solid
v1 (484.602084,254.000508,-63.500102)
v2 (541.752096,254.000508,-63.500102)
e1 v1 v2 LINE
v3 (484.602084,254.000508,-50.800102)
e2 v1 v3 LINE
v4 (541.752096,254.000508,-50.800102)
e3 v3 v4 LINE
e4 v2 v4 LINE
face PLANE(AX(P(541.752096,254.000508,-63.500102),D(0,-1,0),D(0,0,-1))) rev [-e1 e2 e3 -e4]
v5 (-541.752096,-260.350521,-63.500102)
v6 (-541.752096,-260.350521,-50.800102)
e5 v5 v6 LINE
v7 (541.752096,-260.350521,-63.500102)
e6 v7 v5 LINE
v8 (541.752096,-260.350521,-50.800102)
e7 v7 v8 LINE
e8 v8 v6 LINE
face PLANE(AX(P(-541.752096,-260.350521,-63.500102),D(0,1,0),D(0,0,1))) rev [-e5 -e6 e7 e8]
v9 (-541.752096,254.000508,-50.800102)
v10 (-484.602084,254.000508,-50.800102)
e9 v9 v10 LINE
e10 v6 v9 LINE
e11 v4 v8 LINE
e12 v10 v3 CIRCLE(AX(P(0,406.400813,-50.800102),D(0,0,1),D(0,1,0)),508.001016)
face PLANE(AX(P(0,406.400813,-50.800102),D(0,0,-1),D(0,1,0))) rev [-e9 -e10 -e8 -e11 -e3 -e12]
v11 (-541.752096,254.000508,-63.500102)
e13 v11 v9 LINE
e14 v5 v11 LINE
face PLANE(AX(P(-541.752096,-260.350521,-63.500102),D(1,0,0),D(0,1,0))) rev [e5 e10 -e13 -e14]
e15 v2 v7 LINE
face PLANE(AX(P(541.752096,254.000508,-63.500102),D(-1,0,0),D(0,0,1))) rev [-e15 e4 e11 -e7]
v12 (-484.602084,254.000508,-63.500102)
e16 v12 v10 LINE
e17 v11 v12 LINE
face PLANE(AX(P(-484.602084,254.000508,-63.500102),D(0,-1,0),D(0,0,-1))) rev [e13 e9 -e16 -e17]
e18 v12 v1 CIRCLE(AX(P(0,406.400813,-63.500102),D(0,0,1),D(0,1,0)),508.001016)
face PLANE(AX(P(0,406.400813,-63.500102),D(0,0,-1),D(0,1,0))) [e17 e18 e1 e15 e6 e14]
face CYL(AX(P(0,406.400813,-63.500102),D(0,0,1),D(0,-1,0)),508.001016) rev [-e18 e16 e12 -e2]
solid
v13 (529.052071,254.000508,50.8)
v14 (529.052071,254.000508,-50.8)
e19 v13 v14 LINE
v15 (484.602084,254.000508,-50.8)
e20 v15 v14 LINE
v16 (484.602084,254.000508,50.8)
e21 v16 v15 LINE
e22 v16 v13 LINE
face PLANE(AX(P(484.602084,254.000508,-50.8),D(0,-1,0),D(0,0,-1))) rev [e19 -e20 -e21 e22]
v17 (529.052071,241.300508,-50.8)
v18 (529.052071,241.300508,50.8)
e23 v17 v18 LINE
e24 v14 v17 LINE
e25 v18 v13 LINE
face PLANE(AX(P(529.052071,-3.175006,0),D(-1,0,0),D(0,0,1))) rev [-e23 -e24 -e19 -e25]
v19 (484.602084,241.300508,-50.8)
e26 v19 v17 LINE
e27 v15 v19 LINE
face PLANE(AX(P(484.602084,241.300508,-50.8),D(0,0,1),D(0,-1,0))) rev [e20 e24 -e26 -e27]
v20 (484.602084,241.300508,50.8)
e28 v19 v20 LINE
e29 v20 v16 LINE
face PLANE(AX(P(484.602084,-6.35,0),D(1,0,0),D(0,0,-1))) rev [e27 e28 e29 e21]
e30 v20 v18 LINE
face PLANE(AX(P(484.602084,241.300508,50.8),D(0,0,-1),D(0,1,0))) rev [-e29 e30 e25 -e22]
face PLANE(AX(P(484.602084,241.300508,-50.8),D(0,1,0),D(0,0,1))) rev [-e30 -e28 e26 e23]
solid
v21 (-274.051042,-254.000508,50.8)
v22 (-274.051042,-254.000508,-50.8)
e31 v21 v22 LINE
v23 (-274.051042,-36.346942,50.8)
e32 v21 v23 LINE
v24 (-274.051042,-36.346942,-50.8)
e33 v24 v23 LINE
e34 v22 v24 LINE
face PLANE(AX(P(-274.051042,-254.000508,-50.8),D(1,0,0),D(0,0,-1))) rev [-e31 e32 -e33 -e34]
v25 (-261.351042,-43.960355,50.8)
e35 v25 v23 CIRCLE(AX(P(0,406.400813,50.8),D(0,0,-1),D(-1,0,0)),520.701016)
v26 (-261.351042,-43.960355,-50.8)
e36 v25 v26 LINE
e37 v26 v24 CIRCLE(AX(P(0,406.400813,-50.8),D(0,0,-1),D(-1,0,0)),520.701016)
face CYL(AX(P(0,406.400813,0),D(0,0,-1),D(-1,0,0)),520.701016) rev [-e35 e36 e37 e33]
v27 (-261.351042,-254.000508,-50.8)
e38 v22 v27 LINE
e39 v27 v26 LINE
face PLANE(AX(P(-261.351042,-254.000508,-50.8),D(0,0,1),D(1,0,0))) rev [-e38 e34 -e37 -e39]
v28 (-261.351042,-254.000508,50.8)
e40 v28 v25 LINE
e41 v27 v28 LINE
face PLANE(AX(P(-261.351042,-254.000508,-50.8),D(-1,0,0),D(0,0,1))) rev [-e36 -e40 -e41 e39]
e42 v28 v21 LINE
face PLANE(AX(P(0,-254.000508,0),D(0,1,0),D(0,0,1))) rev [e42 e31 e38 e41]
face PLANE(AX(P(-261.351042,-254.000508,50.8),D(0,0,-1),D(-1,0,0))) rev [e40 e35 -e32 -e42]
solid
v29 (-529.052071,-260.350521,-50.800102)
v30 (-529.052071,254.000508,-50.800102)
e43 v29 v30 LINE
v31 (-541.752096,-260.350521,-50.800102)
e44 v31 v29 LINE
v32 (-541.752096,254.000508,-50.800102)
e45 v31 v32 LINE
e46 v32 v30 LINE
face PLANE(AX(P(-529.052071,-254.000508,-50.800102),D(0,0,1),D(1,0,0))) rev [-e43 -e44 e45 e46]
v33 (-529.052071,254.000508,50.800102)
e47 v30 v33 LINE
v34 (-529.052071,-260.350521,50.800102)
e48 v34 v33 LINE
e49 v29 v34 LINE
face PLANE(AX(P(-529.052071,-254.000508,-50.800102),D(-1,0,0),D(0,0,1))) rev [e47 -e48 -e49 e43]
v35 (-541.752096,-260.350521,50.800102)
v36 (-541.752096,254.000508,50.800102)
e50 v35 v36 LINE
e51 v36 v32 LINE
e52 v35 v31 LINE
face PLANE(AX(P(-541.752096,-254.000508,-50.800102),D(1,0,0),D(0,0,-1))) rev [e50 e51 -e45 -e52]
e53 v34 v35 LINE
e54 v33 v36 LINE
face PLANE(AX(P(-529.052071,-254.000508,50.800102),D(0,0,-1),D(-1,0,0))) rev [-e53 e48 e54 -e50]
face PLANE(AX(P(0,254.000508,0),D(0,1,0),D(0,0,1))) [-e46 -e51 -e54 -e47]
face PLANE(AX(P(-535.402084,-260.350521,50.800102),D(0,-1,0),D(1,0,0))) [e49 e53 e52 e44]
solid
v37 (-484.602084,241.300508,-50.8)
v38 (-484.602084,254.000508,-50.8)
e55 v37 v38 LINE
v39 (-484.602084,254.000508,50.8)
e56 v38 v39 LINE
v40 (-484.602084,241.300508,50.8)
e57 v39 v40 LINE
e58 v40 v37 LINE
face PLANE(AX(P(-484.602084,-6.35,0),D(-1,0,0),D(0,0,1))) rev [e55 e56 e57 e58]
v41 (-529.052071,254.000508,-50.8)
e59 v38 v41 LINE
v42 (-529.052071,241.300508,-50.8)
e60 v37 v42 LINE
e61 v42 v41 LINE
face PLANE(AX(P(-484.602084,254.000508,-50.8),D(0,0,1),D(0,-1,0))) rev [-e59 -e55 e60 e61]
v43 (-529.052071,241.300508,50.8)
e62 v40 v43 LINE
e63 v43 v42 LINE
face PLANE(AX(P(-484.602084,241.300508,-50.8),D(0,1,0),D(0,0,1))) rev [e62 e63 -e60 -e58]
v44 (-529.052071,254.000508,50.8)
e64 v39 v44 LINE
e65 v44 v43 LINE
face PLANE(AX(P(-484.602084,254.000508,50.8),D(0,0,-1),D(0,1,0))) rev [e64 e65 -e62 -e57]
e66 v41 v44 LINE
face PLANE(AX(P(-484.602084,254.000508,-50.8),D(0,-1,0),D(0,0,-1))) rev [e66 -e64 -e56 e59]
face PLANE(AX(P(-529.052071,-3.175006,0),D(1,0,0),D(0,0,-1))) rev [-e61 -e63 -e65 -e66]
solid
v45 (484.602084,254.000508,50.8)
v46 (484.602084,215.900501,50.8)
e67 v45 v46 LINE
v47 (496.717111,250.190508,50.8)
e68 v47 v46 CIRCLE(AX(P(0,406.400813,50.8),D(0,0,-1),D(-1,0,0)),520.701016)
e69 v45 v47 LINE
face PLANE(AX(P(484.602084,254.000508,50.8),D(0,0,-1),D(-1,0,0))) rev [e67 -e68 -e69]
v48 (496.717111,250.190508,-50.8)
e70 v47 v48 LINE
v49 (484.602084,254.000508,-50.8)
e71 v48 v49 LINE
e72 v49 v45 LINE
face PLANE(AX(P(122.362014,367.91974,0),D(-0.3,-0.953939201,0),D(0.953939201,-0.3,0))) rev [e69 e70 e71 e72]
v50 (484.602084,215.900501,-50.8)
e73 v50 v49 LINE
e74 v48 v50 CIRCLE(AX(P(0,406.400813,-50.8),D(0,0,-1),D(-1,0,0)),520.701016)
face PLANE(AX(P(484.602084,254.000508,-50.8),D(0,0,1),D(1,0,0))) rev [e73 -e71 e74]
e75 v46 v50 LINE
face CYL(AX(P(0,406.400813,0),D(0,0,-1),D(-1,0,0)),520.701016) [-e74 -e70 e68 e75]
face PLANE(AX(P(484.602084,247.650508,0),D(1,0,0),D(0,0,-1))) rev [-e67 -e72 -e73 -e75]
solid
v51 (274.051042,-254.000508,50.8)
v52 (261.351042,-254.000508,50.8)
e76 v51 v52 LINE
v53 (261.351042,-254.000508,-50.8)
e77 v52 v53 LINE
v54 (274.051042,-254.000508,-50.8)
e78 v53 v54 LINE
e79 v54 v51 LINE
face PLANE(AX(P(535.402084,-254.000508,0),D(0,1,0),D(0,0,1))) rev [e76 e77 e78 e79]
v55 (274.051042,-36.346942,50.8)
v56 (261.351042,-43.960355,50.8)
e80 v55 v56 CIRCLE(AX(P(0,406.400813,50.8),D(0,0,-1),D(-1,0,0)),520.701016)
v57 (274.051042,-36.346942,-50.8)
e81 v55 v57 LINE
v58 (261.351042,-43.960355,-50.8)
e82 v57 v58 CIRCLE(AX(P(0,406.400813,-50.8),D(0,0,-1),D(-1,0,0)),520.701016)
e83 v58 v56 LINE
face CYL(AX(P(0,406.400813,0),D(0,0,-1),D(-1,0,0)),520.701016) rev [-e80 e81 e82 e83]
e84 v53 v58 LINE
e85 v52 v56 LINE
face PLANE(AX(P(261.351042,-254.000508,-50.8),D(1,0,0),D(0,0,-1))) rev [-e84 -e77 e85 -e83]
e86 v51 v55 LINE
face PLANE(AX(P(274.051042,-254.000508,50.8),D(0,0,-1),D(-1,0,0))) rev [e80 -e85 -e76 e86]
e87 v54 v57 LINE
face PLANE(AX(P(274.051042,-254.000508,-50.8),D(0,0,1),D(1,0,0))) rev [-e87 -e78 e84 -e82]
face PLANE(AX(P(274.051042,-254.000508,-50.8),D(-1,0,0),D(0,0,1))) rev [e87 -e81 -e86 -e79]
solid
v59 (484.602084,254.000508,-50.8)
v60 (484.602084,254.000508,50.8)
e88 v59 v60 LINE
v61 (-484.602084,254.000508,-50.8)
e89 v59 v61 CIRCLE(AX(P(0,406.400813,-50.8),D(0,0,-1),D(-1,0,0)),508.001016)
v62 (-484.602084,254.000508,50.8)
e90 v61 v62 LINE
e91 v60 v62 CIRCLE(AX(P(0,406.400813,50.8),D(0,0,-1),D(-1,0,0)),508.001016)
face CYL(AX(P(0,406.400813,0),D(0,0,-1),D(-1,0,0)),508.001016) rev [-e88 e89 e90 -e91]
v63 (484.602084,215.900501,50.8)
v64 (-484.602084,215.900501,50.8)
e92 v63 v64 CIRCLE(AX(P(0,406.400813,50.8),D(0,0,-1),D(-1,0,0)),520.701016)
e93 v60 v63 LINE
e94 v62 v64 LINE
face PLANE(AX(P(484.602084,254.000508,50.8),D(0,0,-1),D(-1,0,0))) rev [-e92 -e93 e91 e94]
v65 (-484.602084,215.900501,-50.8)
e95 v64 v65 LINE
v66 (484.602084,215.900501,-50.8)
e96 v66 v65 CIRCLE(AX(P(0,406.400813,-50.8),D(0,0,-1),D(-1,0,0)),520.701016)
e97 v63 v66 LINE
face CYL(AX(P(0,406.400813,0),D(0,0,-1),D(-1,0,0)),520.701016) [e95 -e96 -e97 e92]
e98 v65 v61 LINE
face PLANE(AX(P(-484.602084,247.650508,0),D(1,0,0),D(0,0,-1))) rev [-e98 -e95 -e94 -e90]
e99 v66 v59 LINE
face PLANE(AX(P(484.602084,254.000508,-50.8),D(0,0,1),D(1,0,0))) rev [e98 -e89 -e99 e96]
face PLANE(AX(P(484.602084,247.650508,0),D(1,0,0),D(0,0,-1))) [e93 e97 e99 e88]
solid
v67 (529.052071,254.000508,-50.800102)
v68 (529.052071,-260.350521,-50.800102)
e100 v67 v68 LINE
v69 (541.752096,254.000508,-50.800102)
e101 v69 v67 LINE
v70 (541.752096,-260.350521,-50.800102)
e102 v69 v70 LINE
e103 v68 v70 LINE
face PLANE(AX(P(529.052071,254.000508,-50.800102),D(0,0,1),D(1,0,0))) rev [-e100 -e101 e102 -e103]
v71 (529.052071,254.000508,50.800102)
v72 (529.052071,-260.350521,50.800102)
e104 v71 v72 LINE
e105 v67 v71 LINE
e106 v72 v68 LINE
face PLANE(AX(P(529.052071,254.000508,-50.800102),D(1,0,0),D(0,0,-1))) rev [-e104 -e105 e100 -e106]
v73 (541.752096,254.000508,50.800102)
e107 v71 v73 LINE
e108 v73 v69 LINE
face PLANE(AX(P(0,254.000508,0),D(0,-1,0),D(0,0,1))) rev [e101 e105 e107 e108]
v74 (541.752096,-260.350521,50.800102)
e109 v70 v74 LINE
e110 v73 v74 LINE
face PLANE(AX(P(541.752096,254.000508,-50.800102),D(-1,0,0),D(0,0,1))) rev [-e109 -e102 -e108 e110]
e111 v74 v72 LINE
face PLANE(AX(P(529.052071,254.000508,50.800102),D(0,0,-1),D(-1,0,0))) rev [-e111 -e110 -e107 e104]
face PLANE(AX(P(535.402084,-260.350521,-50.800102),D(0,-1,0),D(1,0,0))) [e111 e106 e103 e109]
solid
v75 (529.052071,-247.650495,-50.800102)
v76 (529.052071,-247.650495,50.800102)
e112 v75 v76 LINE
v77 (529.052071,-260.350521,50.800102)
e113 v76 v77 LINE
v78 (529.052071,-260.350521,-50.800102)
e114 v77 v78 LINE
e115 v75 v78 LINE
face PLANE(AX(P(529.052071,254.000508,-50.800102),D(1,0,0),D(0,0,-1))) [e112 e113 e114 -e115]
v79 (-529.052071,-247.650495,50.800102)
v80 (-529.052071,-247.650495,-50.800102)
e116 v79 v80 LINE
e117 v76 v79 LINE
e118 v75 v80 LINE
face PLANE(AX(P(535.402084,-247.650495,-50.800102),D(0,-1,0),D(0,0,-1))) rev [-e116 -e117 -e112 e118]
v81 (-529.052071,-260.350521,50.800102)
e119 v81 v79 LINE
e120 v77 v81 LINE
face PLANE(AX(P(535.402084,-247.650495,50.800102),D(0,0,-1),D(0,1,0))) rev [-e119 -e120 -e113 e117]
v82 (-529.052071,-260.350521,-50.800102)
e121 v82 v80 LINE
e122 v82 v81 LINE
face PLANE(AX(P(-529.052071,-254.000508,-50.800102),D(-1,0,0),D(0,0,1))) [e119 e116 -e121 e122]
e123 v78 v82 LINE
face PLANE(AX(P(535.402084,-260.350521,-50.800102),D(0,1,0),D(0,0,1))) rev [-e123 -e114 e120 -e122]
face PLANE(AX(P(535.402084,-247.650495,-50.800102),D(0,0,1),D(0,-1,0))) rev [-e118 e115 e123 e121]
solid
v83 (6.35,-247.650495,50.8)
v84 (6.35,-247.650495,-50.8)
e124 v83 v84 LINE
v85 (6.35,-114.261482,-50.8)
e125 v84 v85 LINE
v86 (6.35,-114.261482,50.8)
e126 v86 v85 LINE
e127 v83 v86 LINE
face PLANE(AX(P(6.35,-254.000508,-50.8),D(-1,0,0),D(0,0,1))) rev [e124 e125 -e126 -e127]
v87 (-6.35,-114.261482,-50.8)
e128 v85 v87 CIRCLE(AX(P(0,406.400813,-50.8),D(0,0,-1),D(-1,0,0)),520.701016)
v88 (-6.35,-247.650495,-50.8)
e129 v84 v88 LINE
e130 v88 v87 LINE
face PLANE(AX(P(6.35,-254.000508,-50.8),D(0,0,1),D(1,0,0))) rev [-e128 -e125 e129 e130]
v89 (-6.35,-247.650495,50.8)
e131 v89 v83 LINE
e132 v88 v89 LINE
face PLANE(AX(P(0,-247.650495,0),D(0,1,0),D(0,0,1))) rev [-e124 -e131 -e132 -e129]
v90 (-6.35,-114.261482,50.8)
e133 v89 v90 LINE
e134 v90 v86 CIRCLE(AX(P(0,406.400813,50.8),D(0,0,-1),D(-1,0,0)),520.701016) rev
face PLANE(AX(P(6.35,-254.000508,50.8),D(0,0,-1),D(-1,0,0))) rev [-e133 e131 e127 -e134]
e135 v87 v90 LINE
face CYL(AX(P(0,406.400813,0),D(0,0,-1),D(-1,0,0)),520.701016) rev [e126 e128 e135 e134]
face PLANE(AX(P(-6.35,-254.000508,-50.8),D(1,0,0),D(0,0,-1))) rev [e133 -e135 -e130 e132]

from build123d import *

# Parameters (mm, degrees)
FLAT_START                                = -50.8001016
FLAT_BAR_CONFIGURED_FB_4_X_0_5_1_OUT_W    = 12.7000254
FLAT_BAR_CONFIGURED_FB_4_X_0_5_1_OUT_H    = 514.351028702
FLAT_BAR_CONFIGURED_FB_4_X_0_5_1_DEPTH    = 101.6002032
FLAT_BAR_CONFIGURED_FB_4_X_0_5_1_2_O_W    = 1058.104141648
FLAT_BAR_CONFIGURED_FB_4_X_0_5_1_2_O_H    = 12.7000254
FLAT_BAR_CONFIGURED_FB_4_X_0_5_1_2_DEPTH  = 101.6002032
FLAT_BAR_CONFIGURED_FB_4_X_0_5_1_3_O_W    = 12.7000254
FLAT_BAR_CONFIGURED_FB_4_X_0_5_1_3_O_H    = 514.351028702
FLAT_BAR_CONFIGURED_FB_4_X_0_5_1_3_DEPTH  = 101.6002032
LAYOUT11_W                                = 101.6
LAYOUT11_H                                = 12.7
MIDDLE_BAR_DEPTH                          = 152.400304801
LAYOUT6_W                                 = 101.6
LAYOUT6_H                                 = 12.7
FLAT_BAR_CONFIGURED_FB_4_X_0_5_4_DEPTH    = 50.8
LAYOUT7_W                                 = 101.6
LAYOUT7_H                                 = 12.7
FLAT_BAR_CONFIGURED_FB_4_X_0_5_5_DEPTH    = 50.8
FLAT_START_2                              = -50.8
FLAT_BAR_CONFIGURED_FB_4_X_0_5_6_DEPTH    = 101.6
TRIM_EXTEND12_START                       = -50.8
TRIM_EXTEND12_DEPTH                       = 101.6
LAYOUT9_W                                 = 101.6
LAYOUT9_H                                 = 12.7
FLAT_BAR_CONFIGURED_FB_4_X_0_5_15_DEPTH   = 228.659286135
LAYOUT9_ON_SEGMENT_2_W                    = 101.6
LAYOUT9_ON_SEGMENT_2_H                    = 12.7
FLAT_BAR_CONFIGURED_FB_4_X_0_5_15_2_DEPTH = 228.659286135
BOSS_EXTRUDE1_DEPTH                       = 12.7


# Read off the part's stored shape, not the designer's step: Flat bar - configured FB - 4 X 0.5(1), Flat bar - configured FB - 4 X 0.5(6), Trim/Extend11, Trim/Extend12
with BuildPart() as part:
    # Flat bar - configured FB - 4 X 0.5(1) out → Flat bar - configured FB - 4 X 0.5(1) (new body)
    with BuildSketch(Plane.XY.offset(FLAT_START)):
        with Locations((-535.402083524, -3.17500635)):
            Rectangle(FLAT_BAR_CONFIGURED_FB_4_X_0_5_1_OUT_W, FLAT_BAR_CONFIGURED_FB_4_X_0_5_1_OUT_H)
    extrude(amount=FLAT_BAR_CONFIGURED_FB_4_X_0_5_1_DEPTH)


with BuildPart() as body_2:
    # Flat bar - configured FB - 4 X 0.5_1 2 o → Flat bar - configured FB - 4 X 0.5_1 2 (new body)
    with BuildSketch(Plane.XY.offset(FLAT_START)):
        with Locations((0, -254.000508001)):
            Rectangle(FLAT_BAR_CONFIGURED_FB_4_X_0_5_1_2_O_W, FLAT_BAR_CONFIGURED_FB_4_X_0_5_1_2_O_H)
    extrude(amount=FLAT_BAR_CONFIGURED_FB_4_X_0_5_1_2_DEPTH)


with BuildPart() as body_3:
    # Flat bar - configured FB - 4 X 0.5_1 3 o → Flat bar - configured FB - 4 X 0.5_1 3 (new body)
    with BuildSketch(Plane.XY.offset(FLAT_START)):
        with Locations((535.402083524, -3.17500635)):
            Rectangle(FLAT_BAR_CONFIGURED_FB_4_X_0_5_1_3_O_W, FLAT_BAR_CONFIGURED_FB_4_X_0_5_1_3_O_H)
    extrude(amount=FLAT_BAR_CONFIGURED_FB_4_X_0_5_1_3_DEPTH)


with BuildPart() as body_4:
    # Layout11 → Middle Bar (new body)
    with BuildSketch(Plane(origin=(0, -101.6002032, 0), x_dir=(0, 0, 1), z_dir=(0, -1, 0))):
        Rectangle(LAYOUT11_W, LAYOUT11_H)
    extrude(amount=MIDDLE_BAR_DEPTH)

    # Trim/Extend1
    split(bisect_by=Plane(origin=(0, -247.650495301, 0), x_dir=(-1, 0, 0), z_dir=(0, 1, 0)), keep=Keep.TOP)

    # Trim/Extend12 outline → Trim/Extend12 (cut)
    with BuildSketch(Plane.XY.offset(TRIM_EXTEND12_START)):
        with BuildLine():
            ThreePointArc((-6.35, -114.261482324), (0, -114.3002032), (6.35, -114.261482324))
            Line((6.35, -114.261482324), (6.35, -101.6002032))
            Line((6.35, -101.6002032), (-6.35, -101.6002032))
            Line((-6.35, -101.6002032), (-6.35, -114.261482324))
        make_face()
    extrude(amount=TRIM_EXTEND12_DEPTH, mode=Mode.SUBTRACT)


with BuildPart() as body_5:
    # Layout6 → Flat bar - configured FB - 4 X 0.5(4) (new body)
    with BuildSketch(Plane(origin=(-535.402083524, 247.650508001, 0), x_dir=(0, 0, 1), z_dir=(1, 0, 0))):
        Rectangle(LAYOUT6_W, LAYOUT6_H)
    extrude(amount=FLAT_BAR_CONFIGURED_FB_4_X_0_5_4_DEPTH)

    # Trim/Extend7
    split(bisect_by=Plane(origin=(-529.052070824, -3.17500635, 0), x_dir=(0, 1, 0), z_dir=(1, 0, 0)), keep=Keep.TOP)


with BuildPart() as body_6:
    # Layout7 → Flat bar - configured FB - 4 X 0.5(5) (new body)
    with BuildSketch(Plane(origin=(535.402083524, 247.650508001, 0), x_dir=(0, 0, 1), z_dir=(-1, 0, 0))):
        Rectangle(LAYOUT7_W, LAYOUT7_H)
    extrude(amount=FLAT_BAR_CONFIGURED_FB_4_X_0_5_5_DEPTH)

    # Trim/Extend8
    split(bisect_by=Plane(origin=(529.052070824, -3.17500635, 0), x_dir=(0, -1, 0), z_dir=(-1, 0, 0)), keep=Keep.TOP)


with BuildPart() as body_7:
    # Flat bar - configured FB - 4 X 0.5(6) out → Flat bar - configured FB - 4 X 0.5(6) (new body)
    with BuildSketch(Plane.XY.offset(FLAT_START_2)):
        with BuildLine():
            Line((496.717111382, 250.190508001), (484.602083524, 254.000508001))
            ThreePointArc((484.602083524, 254.000508001), (0, -101.6002032), (-484.602083524, 254.000508001))
            Line((-484.602083524, 254.000508001), (-496.717111382, 250.190508001))
            ThreePointArc((-496.717111382, 250.190508001), (0, -114.3002032), (496.717111382, 250.190508001))
        make_face()
    extrude(amount=FLAT_BAR_CONFIGURED_FB_4_X_0_5_6_DEPTH)

    # Trim/Extend9
    split(bisect_by=Plane(origin=(-484.602083524, 247.650508001, 0), x_dir=(0, 1, 0), z_dir=(1, 0, 0)), keep=Keep.TOP)


with BuildPart() as body_8:
    # Trim/Extend11: the piece on the far side of the plane
    add(body_7.part)
    split(bisect_by=Plane.YZ.offset(484.602083524), keep=Keep.BOTTOM)


with BuildPart() as body_7_1:
    add(body_7.part)

    # Trim/Extend11
    split(bisect_by=Plane.YZ.offset(484.602083524), keep=Keep.TOP)


with BuildPart() as body_9:
    # Layout9 → Flat bar - configured FB - 4 X 0.5(15) (new body)
    with BuildSketch(Plane(origin=(-267.701041762, -25.341221866, 0), x_dir=(0, 0, 1), z_dir=(0, -1, 0))):
        Rectangle(LAYOUT9_W, LAYOUT9_H)
    extrude(amount=FLAT_BAR_CONFIGURED_FB_4_X_0_5_15_DEPTH)

    # Trim_Extend13 4: cut back where it meets the other member's skin (coped)
    split(bisect_by=body_8.part.faces().sort_by_distance((0, -114.3002032, 0))[0], keep=Keep.TOP)


with BuildPart() as body_10:
    # Layout9 on segment 2 (carried to segment 2) → Flat bar - configured FB - 4 X 0.5_15 2 (new body)
    with BuildSketch(Plane(origin=(267.701041762, -25.341221866, 0), x_dir=(0, 0, 1), z_dir=(0, -1, 0))):
        Rectangle(LAYOUT9_ON_SEGMENT_2_W, LAYOUT9_ON_SEGMENT_2_H)
    extrude(amount=FLAT_BAR_CONFIGURED_FB_4_X_0_5_15_2_DEPTH)

    # Trim_Extend13 4: cut back where it meets the other member's skin (coped)
    split(bisect_by=body_8.part.faces().sort_by_distance((0, -114.3002032, 0))[0], keep=Keep.TOP)


with BuildPart() as body_11:
    # Sketch3 → Boss-Extrude1 (new body)
    with BuildSketch(Plane(origin=(0, 0, -50.8001016), x_dir=(-1, 0, 0), z_dir=(0, 0, -1))):
        with BuildLine():
            Line((541.752096224, -260.350520701), (541.752096224, 254.000508001))
            Line((541.752096224, 254.000508001), (484.602083524, 254.000508001))
            ThreePointArc((484.602083524, 254.000508001), (0, -101.6002032), (-484.602083524, 254.000508001))
            Line((-484.602083524, 254.000508001), (-541.752096224, 254.000508001))
            Line((-541.752096224, 254.000508001), (-541.752096224, -260.350520701))
            Line((-541.752096224, -260.350520701), (541.752096224, -260.350520701))
        make_face()
    extrude(amount=BOSS_EXTRUDE1_DEPTH)


solid = Compound([part.part, body_2.part, body_3.part, body_4.part, body_5.part, body_6.part, body_8.part, body_7_1.part, body_9.part, body_10.part, body_11.part])
